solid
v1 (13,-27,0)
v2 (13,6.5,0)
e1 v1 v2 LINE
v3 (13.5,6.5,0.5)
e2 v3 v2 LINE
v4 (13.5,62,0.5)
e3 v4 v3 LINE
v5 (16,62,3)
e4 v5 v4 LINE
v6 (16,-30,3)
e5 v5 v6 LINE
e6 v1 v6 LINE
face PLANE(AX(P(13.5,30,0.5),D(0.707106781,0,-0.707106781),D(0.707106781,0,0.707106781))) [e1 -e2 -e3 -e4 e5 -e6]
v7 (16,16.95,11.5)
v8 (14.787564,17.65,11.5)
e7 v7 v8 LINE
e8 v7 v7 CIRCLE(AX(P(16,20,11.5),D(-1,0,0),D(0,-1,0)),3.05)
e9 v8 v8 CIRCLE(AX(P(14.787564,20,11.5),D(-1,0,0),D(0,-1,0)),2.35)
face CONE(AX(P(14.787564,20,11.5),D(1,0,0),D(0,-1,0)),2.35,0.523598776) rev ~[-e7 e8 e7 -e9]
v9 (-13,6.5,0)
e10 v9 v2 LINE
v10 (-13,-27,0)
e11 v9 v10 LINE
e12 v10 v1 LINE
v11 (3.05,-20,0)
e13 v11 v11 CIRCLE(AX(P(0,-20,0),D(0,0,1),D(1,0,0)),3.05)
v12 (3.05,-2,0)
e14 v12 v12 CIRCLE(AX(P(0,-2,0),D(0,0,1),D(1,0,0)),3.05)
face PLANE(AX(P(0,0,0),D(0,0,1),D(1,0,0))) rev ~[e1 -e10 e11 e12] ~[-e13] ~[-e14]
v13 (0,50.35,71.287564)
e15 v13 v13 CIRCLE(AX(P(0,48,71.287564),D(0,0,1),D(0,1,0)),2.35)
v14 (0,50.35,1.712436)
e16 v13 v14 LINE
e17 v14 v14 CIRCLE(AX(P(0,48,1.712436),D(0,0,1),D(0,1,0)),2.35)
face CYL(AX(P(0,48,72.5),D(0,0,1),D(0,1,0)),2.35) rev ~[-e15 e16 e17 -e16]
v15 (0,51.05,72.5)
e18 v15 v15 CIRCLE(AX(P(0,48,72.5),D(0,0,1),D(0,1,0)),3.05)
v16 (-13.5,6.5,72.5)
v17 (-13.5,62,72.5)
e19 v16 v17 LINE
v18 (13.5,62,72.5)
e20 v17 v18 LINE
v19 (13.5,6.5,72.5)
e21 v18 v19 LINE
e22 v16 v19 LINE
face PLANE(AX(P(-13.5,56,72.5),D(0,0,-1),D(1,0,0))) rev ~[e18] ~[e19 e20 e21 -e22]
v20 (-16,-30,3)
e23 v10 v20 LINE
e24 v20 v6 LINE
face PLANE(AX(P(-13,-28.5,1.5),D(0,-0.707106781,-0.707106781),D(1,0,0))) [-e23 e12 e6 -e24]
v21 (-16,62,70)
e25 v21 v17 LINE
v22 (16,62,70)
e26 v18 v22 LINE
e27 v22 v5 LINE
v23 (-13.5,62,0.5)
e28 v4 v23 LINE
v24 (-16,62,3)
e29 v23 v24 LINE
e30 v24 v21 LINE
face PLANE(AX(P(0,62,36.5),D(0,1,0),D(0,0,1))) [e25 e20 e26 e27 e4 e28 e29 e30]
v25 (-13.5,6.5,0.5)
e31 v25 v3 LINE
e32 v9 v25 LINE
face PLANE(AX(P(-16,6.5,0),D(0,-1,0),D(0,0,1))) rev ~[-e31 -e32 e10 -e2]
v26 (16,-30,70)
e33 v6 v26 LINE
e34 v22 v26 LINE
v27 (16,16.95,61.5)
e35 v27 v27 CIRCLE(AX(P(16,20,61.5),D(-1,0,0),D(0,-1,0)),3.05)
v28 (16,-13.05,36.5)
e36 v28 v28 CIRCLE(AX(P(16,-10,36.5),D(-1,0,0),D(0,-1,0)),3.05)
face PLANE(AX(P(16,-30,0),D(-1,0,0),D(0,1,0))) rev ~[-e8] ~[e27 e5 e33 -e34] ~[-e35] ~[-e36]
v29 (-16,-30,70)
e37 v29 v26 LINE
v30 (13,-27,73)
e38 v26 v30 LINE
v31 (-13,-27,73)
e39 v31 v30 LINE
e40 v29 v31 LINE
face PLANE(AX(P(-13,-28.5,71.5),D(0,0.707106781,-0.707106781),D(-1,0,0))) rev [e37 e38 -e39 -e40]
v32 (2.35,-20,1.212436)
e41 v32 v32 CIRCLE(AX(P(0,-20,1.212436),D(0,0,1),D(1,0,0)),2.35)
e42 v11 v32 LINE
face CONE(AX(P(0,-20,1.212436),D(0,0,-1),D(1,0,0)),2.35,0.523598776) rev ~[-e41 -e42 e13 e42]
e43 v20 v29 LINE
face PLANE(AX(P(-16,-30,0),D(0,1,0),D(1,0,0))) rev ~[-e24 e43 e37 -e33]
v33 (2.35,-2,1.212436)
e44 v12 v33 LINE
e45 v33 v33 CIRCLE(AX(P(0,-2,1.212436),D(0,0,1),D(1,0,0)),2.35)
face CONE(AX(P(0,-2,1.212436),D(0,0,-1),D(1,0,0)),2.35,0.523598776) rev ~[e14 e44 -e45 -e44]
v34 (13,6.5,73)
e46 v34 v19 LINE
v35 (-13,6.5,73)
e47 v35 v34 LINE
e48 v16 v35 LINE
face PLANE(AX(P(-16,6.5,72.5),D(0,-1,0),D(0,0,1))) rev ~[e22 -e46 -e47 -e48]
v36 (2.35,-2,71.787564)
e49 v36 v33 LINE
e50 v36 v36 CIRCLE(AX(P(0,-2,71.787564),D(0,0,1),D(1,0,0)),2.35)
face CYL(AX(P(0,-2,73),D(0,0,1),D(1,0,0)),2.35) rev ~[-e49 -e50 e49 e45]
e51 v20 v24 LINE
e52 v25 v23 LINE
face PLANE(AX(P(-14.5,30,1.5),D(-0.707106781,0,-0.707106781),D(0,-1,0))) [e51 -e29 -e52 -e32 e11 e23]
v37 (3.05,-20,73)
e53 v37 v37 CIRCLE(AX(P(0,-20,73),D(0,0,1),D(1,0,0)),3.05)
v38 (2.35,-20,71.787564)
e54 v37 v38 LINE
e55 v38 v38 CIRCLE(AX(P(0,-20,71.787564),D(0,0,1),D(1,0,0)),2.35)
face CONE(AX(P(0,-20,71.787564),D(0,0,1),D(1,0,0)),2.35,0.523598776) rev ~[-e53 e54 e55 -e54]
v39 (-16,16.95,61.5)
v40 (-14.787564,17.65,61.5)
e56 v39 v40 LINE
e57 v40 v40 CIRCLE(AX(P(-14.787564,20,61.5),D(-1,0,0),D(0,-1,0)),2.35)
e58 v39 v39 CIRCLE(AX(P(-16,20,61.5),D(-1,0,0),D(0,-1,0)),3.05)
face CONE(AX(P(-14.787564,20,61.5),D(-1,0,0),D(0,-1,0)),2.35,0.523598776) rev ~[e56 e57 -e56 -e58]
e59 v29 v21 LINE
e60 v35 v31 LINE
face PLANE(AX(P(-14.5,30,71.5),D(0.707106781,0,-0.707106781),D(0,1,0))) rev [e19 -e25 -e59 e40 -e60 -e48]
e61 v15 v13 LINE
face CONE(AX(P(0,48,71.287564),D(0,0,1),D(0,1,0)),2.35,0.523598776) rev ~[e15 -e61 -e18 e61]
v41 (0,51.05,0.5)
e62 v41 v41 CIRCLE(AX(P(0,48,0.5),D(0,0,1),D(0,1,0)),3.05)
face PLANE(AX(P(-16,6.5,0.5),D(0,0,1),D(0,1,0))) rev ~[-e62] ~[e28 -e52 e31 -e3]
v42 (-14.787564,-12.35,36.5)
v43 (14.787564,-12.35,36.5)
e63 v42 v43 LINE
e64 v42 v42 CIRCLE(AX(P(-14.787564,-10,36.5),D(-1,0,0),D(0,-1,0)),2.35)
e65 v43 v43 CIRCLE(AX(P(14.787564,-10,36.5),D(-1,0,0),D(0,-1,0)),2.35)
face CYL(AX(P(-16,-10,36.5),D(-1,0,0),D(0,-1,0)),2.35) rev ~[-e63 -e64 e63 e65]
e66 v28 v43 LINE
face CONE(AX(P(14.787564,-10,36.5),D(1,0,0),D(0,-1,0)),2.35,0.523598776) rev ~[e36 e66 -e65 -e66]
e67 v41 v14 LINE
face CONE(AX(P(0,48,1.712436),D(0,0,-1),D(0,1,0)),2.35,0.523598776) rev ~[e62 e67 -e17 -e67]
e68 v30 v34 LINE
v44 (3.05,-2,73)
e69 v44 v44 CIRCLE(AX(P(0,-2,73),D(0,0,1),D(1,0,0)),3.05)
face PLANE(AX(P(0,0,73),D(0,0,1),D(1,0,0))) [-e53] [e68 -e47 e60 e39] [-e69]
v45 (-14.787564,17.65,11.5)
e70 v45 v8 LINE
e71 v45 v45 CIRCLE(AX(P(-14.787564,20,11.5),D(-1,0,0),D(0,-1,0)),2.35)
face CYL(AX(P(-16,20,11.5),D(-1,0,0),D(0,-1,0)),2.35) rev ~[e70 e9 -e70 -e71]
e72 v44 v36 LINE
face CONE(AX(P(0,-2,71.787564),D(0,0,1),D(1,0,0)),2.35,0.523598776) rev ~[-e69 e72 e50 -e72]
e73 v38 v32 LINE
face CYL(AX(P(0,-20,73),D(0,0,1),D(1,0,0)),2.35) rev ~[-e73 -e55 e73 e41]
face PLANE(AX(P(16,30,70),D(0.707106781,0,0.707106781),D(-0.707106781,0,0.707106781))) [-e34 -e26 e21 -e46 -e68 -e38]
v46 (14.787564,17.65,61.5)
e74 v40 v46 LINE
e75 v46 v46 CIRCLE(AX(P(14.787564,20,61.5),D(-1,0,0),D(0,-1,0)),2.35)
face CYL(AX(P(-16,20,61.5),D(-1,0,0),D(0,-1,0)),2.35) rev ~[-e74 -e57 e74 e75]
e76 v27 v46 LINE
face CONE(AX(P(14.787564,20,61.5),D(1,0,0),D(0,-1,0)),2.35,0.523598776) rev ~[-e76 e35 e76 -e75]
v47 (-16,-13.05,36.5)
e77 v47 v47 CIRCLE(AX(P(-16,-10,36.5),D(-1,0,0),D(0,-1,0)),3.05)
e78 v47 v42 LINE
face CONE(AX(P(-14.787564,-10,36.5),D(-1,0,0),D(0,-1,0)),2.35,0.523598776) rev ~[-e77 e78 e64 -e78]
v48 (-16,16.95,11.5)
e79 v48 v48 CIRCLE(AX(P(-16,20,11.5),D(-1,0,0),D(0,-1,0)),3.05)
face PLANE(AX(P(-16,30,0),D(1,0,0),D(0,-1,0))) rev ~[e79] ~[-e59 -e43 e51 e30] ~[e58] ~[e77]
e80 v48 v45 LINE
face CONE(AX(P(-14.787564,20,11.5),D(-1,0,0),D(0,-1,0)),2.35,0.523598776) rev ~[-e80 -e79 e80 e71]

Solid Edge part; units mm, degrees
sketch "Sketch1" plane through (0, 0, 0) normal (0, 0, 1) x (1, 0, 0)
  line L0 (-16, -30) -> (16, -30)
  line L1 (16, -30) -> (16, 30)
  line L2 (16, 30) -> (-16, 30)
  line L3 (-16, 30) -> (-16, -30)
  dimension "D1" = 32
  dimension "D2" = 60
extrude "Protrusion1" add sketch "Sketch1" along normal blind 73
sketch "Sketch2" plane through (0, 0, 73) normal (0, 0, 1) x (1, 0, 0)
  circle A0 centre (0, -20) radius 2.35
  circle A1 centre (0, -2) radius 2.35
  dimension "D1" = 4.7
  dimension "D2" = 18
  dimension "D3" = 10
extrude "Cutout1" cut sketch "Sketch2" against normal through all
chamfer "Fase_3" distance 0.7 angle 60 4 edges at (-2.35, -2, 73) (-2.35, -20, 73) (-2.35, -20, 0) (-2.35, -2, 0) measured on face at (-10.9867, -19.4, 73) measured on face at (-10.9867, -19.4, 0)
chamfer "Fase_6" distance 3 angle 45 4 edges at (-16, 0, 73) (-16, 0, 0) (16, 0, 73) (16, 0, 0)
chamfer "Fase_7" distance 3 angle 45 2 edges at (0, -30, 73) (0, -30, 0)
sketch "Sketch3" plane through (-16, 0, 36.5) normal (-1, 0, 0) x (0, -1, 0)
  circle A0 centre (-20, 25) radius 2.35
  circle A1 centre (-20, -25) radius 2.35
  circle A2 centre (10, 0) radius 2.35
  dimension "D1" = 4.7
  dimension "D2" = 50
  dimension "D3" = 10
  dimension "D4" = 30
extrude "Cutout2" cut sketch "Sketch3" against normal through all
chamfer "Fase_9" distance 0.7 angle 60 6 edges at (-16, 22.35, 61.5) (-16, -7.65, 36.5) (-16, 22.35, 11.5) (16, 20, 59.15) (16, 20, 9.15) (16, -10, 34.15) measured on face at (-16, 20.6, 58.1633) measured on face at (16, -20.6, 58.1633)
sketch "Sketch4" plane through (-16, 0, 36.5) normal (-1, 0, 0) x (0, -1, 0)
  line L0 (-6.5, 36.5) -> (-30, 36.5)
  line L1 (-30, 36.5) -> (-30, 36)
  line L2 (-30, 36) -> (-6.5, 36)
  line L3 (-6.5, 36) -> (-6.5, 36.5)
  line L4 (-30, -36.5) -> (-6.5, -36.5)
  line L5 (-6.5, -36.5) -> (-6.5, -36)
  line L6 (-6.5, -36) -> (-30, -36)
  line L7 (-30, -36) -> (-30, -36.5)
  dimension "D1" = 0.5
  dimension "D2" = 36.5
  dimension "D3" = 0.5
  dimension "D4" = 36.5
extrude "Cutout3" cut sketch "Sketch4" against normal through all
sketch "Sketch5" plane through (0, 30, 36.5) normal (0, 1, 0) x (1, 0, 0)
  line L0 (-16, 33.5) -> (-13.5, 36)
  line L1 (-13.5, 36) -> (13.5, 36)
  line L2 (13.5, 36) -> (16, 33.5)
  line L3 (16, 33.5) -> (16, -33.5)
  line L4 (16, -33.5) -> (13.5, -36)
  line L5 (13.5, -36) -> (-13.5, -36)
  line L6 (-13.5, -36) -> (-16, -33.5)
  line L7 (-16, -33.5) -> (-16, 33.5)
extrude "Protrusion2" add sketch "Sketch5" along normal blind 26
sketch "Sketch6" plane through (0, 36.25, 72.5) normal (0, 0, 1) x (0, 1, 0)
  circle A0 centre (11.75, 0) radius 2.35
  dimension "D1" = 8
extrude "Cutout4" cut sketch "Sketch6" against normal through all
chamfer "Fase_10" distance 0.7 angle 60 2 edges at (0, 45.65, 72.5) (-2.35, 48, 0.5) measured on face at (8.73, 48.245, 72.5) measured on face at (8.73, 14.255, 0.5)
sketch "Sketch7" plane through (0, 56, 36.5) normal (0, 1, 0) x (-1, 0, 0)
  line L0 (-13.5, 36) -> (-16, 33.5)
  line L1 (-16, 33.5) -> (-16, -33.5)
  line L2 (-16, -33.5) -> (-13.5, -36)
  line L3 (-13.5, -36) -> (13.5, -36)
  line L4 (13.5, -36) -> (16, -33.5)
  line L5 (16, -33.5) -> (16, 33.5)
  line L6 (16, 33.5) -> (13.5, 36)
  line L7 (13.5, 36) -> (-13.5, 36)
extrude "Extrusionsausprägung_3" add sketch "Sketch7" along normal blind 6
properties material "Nylon, allgemein"
